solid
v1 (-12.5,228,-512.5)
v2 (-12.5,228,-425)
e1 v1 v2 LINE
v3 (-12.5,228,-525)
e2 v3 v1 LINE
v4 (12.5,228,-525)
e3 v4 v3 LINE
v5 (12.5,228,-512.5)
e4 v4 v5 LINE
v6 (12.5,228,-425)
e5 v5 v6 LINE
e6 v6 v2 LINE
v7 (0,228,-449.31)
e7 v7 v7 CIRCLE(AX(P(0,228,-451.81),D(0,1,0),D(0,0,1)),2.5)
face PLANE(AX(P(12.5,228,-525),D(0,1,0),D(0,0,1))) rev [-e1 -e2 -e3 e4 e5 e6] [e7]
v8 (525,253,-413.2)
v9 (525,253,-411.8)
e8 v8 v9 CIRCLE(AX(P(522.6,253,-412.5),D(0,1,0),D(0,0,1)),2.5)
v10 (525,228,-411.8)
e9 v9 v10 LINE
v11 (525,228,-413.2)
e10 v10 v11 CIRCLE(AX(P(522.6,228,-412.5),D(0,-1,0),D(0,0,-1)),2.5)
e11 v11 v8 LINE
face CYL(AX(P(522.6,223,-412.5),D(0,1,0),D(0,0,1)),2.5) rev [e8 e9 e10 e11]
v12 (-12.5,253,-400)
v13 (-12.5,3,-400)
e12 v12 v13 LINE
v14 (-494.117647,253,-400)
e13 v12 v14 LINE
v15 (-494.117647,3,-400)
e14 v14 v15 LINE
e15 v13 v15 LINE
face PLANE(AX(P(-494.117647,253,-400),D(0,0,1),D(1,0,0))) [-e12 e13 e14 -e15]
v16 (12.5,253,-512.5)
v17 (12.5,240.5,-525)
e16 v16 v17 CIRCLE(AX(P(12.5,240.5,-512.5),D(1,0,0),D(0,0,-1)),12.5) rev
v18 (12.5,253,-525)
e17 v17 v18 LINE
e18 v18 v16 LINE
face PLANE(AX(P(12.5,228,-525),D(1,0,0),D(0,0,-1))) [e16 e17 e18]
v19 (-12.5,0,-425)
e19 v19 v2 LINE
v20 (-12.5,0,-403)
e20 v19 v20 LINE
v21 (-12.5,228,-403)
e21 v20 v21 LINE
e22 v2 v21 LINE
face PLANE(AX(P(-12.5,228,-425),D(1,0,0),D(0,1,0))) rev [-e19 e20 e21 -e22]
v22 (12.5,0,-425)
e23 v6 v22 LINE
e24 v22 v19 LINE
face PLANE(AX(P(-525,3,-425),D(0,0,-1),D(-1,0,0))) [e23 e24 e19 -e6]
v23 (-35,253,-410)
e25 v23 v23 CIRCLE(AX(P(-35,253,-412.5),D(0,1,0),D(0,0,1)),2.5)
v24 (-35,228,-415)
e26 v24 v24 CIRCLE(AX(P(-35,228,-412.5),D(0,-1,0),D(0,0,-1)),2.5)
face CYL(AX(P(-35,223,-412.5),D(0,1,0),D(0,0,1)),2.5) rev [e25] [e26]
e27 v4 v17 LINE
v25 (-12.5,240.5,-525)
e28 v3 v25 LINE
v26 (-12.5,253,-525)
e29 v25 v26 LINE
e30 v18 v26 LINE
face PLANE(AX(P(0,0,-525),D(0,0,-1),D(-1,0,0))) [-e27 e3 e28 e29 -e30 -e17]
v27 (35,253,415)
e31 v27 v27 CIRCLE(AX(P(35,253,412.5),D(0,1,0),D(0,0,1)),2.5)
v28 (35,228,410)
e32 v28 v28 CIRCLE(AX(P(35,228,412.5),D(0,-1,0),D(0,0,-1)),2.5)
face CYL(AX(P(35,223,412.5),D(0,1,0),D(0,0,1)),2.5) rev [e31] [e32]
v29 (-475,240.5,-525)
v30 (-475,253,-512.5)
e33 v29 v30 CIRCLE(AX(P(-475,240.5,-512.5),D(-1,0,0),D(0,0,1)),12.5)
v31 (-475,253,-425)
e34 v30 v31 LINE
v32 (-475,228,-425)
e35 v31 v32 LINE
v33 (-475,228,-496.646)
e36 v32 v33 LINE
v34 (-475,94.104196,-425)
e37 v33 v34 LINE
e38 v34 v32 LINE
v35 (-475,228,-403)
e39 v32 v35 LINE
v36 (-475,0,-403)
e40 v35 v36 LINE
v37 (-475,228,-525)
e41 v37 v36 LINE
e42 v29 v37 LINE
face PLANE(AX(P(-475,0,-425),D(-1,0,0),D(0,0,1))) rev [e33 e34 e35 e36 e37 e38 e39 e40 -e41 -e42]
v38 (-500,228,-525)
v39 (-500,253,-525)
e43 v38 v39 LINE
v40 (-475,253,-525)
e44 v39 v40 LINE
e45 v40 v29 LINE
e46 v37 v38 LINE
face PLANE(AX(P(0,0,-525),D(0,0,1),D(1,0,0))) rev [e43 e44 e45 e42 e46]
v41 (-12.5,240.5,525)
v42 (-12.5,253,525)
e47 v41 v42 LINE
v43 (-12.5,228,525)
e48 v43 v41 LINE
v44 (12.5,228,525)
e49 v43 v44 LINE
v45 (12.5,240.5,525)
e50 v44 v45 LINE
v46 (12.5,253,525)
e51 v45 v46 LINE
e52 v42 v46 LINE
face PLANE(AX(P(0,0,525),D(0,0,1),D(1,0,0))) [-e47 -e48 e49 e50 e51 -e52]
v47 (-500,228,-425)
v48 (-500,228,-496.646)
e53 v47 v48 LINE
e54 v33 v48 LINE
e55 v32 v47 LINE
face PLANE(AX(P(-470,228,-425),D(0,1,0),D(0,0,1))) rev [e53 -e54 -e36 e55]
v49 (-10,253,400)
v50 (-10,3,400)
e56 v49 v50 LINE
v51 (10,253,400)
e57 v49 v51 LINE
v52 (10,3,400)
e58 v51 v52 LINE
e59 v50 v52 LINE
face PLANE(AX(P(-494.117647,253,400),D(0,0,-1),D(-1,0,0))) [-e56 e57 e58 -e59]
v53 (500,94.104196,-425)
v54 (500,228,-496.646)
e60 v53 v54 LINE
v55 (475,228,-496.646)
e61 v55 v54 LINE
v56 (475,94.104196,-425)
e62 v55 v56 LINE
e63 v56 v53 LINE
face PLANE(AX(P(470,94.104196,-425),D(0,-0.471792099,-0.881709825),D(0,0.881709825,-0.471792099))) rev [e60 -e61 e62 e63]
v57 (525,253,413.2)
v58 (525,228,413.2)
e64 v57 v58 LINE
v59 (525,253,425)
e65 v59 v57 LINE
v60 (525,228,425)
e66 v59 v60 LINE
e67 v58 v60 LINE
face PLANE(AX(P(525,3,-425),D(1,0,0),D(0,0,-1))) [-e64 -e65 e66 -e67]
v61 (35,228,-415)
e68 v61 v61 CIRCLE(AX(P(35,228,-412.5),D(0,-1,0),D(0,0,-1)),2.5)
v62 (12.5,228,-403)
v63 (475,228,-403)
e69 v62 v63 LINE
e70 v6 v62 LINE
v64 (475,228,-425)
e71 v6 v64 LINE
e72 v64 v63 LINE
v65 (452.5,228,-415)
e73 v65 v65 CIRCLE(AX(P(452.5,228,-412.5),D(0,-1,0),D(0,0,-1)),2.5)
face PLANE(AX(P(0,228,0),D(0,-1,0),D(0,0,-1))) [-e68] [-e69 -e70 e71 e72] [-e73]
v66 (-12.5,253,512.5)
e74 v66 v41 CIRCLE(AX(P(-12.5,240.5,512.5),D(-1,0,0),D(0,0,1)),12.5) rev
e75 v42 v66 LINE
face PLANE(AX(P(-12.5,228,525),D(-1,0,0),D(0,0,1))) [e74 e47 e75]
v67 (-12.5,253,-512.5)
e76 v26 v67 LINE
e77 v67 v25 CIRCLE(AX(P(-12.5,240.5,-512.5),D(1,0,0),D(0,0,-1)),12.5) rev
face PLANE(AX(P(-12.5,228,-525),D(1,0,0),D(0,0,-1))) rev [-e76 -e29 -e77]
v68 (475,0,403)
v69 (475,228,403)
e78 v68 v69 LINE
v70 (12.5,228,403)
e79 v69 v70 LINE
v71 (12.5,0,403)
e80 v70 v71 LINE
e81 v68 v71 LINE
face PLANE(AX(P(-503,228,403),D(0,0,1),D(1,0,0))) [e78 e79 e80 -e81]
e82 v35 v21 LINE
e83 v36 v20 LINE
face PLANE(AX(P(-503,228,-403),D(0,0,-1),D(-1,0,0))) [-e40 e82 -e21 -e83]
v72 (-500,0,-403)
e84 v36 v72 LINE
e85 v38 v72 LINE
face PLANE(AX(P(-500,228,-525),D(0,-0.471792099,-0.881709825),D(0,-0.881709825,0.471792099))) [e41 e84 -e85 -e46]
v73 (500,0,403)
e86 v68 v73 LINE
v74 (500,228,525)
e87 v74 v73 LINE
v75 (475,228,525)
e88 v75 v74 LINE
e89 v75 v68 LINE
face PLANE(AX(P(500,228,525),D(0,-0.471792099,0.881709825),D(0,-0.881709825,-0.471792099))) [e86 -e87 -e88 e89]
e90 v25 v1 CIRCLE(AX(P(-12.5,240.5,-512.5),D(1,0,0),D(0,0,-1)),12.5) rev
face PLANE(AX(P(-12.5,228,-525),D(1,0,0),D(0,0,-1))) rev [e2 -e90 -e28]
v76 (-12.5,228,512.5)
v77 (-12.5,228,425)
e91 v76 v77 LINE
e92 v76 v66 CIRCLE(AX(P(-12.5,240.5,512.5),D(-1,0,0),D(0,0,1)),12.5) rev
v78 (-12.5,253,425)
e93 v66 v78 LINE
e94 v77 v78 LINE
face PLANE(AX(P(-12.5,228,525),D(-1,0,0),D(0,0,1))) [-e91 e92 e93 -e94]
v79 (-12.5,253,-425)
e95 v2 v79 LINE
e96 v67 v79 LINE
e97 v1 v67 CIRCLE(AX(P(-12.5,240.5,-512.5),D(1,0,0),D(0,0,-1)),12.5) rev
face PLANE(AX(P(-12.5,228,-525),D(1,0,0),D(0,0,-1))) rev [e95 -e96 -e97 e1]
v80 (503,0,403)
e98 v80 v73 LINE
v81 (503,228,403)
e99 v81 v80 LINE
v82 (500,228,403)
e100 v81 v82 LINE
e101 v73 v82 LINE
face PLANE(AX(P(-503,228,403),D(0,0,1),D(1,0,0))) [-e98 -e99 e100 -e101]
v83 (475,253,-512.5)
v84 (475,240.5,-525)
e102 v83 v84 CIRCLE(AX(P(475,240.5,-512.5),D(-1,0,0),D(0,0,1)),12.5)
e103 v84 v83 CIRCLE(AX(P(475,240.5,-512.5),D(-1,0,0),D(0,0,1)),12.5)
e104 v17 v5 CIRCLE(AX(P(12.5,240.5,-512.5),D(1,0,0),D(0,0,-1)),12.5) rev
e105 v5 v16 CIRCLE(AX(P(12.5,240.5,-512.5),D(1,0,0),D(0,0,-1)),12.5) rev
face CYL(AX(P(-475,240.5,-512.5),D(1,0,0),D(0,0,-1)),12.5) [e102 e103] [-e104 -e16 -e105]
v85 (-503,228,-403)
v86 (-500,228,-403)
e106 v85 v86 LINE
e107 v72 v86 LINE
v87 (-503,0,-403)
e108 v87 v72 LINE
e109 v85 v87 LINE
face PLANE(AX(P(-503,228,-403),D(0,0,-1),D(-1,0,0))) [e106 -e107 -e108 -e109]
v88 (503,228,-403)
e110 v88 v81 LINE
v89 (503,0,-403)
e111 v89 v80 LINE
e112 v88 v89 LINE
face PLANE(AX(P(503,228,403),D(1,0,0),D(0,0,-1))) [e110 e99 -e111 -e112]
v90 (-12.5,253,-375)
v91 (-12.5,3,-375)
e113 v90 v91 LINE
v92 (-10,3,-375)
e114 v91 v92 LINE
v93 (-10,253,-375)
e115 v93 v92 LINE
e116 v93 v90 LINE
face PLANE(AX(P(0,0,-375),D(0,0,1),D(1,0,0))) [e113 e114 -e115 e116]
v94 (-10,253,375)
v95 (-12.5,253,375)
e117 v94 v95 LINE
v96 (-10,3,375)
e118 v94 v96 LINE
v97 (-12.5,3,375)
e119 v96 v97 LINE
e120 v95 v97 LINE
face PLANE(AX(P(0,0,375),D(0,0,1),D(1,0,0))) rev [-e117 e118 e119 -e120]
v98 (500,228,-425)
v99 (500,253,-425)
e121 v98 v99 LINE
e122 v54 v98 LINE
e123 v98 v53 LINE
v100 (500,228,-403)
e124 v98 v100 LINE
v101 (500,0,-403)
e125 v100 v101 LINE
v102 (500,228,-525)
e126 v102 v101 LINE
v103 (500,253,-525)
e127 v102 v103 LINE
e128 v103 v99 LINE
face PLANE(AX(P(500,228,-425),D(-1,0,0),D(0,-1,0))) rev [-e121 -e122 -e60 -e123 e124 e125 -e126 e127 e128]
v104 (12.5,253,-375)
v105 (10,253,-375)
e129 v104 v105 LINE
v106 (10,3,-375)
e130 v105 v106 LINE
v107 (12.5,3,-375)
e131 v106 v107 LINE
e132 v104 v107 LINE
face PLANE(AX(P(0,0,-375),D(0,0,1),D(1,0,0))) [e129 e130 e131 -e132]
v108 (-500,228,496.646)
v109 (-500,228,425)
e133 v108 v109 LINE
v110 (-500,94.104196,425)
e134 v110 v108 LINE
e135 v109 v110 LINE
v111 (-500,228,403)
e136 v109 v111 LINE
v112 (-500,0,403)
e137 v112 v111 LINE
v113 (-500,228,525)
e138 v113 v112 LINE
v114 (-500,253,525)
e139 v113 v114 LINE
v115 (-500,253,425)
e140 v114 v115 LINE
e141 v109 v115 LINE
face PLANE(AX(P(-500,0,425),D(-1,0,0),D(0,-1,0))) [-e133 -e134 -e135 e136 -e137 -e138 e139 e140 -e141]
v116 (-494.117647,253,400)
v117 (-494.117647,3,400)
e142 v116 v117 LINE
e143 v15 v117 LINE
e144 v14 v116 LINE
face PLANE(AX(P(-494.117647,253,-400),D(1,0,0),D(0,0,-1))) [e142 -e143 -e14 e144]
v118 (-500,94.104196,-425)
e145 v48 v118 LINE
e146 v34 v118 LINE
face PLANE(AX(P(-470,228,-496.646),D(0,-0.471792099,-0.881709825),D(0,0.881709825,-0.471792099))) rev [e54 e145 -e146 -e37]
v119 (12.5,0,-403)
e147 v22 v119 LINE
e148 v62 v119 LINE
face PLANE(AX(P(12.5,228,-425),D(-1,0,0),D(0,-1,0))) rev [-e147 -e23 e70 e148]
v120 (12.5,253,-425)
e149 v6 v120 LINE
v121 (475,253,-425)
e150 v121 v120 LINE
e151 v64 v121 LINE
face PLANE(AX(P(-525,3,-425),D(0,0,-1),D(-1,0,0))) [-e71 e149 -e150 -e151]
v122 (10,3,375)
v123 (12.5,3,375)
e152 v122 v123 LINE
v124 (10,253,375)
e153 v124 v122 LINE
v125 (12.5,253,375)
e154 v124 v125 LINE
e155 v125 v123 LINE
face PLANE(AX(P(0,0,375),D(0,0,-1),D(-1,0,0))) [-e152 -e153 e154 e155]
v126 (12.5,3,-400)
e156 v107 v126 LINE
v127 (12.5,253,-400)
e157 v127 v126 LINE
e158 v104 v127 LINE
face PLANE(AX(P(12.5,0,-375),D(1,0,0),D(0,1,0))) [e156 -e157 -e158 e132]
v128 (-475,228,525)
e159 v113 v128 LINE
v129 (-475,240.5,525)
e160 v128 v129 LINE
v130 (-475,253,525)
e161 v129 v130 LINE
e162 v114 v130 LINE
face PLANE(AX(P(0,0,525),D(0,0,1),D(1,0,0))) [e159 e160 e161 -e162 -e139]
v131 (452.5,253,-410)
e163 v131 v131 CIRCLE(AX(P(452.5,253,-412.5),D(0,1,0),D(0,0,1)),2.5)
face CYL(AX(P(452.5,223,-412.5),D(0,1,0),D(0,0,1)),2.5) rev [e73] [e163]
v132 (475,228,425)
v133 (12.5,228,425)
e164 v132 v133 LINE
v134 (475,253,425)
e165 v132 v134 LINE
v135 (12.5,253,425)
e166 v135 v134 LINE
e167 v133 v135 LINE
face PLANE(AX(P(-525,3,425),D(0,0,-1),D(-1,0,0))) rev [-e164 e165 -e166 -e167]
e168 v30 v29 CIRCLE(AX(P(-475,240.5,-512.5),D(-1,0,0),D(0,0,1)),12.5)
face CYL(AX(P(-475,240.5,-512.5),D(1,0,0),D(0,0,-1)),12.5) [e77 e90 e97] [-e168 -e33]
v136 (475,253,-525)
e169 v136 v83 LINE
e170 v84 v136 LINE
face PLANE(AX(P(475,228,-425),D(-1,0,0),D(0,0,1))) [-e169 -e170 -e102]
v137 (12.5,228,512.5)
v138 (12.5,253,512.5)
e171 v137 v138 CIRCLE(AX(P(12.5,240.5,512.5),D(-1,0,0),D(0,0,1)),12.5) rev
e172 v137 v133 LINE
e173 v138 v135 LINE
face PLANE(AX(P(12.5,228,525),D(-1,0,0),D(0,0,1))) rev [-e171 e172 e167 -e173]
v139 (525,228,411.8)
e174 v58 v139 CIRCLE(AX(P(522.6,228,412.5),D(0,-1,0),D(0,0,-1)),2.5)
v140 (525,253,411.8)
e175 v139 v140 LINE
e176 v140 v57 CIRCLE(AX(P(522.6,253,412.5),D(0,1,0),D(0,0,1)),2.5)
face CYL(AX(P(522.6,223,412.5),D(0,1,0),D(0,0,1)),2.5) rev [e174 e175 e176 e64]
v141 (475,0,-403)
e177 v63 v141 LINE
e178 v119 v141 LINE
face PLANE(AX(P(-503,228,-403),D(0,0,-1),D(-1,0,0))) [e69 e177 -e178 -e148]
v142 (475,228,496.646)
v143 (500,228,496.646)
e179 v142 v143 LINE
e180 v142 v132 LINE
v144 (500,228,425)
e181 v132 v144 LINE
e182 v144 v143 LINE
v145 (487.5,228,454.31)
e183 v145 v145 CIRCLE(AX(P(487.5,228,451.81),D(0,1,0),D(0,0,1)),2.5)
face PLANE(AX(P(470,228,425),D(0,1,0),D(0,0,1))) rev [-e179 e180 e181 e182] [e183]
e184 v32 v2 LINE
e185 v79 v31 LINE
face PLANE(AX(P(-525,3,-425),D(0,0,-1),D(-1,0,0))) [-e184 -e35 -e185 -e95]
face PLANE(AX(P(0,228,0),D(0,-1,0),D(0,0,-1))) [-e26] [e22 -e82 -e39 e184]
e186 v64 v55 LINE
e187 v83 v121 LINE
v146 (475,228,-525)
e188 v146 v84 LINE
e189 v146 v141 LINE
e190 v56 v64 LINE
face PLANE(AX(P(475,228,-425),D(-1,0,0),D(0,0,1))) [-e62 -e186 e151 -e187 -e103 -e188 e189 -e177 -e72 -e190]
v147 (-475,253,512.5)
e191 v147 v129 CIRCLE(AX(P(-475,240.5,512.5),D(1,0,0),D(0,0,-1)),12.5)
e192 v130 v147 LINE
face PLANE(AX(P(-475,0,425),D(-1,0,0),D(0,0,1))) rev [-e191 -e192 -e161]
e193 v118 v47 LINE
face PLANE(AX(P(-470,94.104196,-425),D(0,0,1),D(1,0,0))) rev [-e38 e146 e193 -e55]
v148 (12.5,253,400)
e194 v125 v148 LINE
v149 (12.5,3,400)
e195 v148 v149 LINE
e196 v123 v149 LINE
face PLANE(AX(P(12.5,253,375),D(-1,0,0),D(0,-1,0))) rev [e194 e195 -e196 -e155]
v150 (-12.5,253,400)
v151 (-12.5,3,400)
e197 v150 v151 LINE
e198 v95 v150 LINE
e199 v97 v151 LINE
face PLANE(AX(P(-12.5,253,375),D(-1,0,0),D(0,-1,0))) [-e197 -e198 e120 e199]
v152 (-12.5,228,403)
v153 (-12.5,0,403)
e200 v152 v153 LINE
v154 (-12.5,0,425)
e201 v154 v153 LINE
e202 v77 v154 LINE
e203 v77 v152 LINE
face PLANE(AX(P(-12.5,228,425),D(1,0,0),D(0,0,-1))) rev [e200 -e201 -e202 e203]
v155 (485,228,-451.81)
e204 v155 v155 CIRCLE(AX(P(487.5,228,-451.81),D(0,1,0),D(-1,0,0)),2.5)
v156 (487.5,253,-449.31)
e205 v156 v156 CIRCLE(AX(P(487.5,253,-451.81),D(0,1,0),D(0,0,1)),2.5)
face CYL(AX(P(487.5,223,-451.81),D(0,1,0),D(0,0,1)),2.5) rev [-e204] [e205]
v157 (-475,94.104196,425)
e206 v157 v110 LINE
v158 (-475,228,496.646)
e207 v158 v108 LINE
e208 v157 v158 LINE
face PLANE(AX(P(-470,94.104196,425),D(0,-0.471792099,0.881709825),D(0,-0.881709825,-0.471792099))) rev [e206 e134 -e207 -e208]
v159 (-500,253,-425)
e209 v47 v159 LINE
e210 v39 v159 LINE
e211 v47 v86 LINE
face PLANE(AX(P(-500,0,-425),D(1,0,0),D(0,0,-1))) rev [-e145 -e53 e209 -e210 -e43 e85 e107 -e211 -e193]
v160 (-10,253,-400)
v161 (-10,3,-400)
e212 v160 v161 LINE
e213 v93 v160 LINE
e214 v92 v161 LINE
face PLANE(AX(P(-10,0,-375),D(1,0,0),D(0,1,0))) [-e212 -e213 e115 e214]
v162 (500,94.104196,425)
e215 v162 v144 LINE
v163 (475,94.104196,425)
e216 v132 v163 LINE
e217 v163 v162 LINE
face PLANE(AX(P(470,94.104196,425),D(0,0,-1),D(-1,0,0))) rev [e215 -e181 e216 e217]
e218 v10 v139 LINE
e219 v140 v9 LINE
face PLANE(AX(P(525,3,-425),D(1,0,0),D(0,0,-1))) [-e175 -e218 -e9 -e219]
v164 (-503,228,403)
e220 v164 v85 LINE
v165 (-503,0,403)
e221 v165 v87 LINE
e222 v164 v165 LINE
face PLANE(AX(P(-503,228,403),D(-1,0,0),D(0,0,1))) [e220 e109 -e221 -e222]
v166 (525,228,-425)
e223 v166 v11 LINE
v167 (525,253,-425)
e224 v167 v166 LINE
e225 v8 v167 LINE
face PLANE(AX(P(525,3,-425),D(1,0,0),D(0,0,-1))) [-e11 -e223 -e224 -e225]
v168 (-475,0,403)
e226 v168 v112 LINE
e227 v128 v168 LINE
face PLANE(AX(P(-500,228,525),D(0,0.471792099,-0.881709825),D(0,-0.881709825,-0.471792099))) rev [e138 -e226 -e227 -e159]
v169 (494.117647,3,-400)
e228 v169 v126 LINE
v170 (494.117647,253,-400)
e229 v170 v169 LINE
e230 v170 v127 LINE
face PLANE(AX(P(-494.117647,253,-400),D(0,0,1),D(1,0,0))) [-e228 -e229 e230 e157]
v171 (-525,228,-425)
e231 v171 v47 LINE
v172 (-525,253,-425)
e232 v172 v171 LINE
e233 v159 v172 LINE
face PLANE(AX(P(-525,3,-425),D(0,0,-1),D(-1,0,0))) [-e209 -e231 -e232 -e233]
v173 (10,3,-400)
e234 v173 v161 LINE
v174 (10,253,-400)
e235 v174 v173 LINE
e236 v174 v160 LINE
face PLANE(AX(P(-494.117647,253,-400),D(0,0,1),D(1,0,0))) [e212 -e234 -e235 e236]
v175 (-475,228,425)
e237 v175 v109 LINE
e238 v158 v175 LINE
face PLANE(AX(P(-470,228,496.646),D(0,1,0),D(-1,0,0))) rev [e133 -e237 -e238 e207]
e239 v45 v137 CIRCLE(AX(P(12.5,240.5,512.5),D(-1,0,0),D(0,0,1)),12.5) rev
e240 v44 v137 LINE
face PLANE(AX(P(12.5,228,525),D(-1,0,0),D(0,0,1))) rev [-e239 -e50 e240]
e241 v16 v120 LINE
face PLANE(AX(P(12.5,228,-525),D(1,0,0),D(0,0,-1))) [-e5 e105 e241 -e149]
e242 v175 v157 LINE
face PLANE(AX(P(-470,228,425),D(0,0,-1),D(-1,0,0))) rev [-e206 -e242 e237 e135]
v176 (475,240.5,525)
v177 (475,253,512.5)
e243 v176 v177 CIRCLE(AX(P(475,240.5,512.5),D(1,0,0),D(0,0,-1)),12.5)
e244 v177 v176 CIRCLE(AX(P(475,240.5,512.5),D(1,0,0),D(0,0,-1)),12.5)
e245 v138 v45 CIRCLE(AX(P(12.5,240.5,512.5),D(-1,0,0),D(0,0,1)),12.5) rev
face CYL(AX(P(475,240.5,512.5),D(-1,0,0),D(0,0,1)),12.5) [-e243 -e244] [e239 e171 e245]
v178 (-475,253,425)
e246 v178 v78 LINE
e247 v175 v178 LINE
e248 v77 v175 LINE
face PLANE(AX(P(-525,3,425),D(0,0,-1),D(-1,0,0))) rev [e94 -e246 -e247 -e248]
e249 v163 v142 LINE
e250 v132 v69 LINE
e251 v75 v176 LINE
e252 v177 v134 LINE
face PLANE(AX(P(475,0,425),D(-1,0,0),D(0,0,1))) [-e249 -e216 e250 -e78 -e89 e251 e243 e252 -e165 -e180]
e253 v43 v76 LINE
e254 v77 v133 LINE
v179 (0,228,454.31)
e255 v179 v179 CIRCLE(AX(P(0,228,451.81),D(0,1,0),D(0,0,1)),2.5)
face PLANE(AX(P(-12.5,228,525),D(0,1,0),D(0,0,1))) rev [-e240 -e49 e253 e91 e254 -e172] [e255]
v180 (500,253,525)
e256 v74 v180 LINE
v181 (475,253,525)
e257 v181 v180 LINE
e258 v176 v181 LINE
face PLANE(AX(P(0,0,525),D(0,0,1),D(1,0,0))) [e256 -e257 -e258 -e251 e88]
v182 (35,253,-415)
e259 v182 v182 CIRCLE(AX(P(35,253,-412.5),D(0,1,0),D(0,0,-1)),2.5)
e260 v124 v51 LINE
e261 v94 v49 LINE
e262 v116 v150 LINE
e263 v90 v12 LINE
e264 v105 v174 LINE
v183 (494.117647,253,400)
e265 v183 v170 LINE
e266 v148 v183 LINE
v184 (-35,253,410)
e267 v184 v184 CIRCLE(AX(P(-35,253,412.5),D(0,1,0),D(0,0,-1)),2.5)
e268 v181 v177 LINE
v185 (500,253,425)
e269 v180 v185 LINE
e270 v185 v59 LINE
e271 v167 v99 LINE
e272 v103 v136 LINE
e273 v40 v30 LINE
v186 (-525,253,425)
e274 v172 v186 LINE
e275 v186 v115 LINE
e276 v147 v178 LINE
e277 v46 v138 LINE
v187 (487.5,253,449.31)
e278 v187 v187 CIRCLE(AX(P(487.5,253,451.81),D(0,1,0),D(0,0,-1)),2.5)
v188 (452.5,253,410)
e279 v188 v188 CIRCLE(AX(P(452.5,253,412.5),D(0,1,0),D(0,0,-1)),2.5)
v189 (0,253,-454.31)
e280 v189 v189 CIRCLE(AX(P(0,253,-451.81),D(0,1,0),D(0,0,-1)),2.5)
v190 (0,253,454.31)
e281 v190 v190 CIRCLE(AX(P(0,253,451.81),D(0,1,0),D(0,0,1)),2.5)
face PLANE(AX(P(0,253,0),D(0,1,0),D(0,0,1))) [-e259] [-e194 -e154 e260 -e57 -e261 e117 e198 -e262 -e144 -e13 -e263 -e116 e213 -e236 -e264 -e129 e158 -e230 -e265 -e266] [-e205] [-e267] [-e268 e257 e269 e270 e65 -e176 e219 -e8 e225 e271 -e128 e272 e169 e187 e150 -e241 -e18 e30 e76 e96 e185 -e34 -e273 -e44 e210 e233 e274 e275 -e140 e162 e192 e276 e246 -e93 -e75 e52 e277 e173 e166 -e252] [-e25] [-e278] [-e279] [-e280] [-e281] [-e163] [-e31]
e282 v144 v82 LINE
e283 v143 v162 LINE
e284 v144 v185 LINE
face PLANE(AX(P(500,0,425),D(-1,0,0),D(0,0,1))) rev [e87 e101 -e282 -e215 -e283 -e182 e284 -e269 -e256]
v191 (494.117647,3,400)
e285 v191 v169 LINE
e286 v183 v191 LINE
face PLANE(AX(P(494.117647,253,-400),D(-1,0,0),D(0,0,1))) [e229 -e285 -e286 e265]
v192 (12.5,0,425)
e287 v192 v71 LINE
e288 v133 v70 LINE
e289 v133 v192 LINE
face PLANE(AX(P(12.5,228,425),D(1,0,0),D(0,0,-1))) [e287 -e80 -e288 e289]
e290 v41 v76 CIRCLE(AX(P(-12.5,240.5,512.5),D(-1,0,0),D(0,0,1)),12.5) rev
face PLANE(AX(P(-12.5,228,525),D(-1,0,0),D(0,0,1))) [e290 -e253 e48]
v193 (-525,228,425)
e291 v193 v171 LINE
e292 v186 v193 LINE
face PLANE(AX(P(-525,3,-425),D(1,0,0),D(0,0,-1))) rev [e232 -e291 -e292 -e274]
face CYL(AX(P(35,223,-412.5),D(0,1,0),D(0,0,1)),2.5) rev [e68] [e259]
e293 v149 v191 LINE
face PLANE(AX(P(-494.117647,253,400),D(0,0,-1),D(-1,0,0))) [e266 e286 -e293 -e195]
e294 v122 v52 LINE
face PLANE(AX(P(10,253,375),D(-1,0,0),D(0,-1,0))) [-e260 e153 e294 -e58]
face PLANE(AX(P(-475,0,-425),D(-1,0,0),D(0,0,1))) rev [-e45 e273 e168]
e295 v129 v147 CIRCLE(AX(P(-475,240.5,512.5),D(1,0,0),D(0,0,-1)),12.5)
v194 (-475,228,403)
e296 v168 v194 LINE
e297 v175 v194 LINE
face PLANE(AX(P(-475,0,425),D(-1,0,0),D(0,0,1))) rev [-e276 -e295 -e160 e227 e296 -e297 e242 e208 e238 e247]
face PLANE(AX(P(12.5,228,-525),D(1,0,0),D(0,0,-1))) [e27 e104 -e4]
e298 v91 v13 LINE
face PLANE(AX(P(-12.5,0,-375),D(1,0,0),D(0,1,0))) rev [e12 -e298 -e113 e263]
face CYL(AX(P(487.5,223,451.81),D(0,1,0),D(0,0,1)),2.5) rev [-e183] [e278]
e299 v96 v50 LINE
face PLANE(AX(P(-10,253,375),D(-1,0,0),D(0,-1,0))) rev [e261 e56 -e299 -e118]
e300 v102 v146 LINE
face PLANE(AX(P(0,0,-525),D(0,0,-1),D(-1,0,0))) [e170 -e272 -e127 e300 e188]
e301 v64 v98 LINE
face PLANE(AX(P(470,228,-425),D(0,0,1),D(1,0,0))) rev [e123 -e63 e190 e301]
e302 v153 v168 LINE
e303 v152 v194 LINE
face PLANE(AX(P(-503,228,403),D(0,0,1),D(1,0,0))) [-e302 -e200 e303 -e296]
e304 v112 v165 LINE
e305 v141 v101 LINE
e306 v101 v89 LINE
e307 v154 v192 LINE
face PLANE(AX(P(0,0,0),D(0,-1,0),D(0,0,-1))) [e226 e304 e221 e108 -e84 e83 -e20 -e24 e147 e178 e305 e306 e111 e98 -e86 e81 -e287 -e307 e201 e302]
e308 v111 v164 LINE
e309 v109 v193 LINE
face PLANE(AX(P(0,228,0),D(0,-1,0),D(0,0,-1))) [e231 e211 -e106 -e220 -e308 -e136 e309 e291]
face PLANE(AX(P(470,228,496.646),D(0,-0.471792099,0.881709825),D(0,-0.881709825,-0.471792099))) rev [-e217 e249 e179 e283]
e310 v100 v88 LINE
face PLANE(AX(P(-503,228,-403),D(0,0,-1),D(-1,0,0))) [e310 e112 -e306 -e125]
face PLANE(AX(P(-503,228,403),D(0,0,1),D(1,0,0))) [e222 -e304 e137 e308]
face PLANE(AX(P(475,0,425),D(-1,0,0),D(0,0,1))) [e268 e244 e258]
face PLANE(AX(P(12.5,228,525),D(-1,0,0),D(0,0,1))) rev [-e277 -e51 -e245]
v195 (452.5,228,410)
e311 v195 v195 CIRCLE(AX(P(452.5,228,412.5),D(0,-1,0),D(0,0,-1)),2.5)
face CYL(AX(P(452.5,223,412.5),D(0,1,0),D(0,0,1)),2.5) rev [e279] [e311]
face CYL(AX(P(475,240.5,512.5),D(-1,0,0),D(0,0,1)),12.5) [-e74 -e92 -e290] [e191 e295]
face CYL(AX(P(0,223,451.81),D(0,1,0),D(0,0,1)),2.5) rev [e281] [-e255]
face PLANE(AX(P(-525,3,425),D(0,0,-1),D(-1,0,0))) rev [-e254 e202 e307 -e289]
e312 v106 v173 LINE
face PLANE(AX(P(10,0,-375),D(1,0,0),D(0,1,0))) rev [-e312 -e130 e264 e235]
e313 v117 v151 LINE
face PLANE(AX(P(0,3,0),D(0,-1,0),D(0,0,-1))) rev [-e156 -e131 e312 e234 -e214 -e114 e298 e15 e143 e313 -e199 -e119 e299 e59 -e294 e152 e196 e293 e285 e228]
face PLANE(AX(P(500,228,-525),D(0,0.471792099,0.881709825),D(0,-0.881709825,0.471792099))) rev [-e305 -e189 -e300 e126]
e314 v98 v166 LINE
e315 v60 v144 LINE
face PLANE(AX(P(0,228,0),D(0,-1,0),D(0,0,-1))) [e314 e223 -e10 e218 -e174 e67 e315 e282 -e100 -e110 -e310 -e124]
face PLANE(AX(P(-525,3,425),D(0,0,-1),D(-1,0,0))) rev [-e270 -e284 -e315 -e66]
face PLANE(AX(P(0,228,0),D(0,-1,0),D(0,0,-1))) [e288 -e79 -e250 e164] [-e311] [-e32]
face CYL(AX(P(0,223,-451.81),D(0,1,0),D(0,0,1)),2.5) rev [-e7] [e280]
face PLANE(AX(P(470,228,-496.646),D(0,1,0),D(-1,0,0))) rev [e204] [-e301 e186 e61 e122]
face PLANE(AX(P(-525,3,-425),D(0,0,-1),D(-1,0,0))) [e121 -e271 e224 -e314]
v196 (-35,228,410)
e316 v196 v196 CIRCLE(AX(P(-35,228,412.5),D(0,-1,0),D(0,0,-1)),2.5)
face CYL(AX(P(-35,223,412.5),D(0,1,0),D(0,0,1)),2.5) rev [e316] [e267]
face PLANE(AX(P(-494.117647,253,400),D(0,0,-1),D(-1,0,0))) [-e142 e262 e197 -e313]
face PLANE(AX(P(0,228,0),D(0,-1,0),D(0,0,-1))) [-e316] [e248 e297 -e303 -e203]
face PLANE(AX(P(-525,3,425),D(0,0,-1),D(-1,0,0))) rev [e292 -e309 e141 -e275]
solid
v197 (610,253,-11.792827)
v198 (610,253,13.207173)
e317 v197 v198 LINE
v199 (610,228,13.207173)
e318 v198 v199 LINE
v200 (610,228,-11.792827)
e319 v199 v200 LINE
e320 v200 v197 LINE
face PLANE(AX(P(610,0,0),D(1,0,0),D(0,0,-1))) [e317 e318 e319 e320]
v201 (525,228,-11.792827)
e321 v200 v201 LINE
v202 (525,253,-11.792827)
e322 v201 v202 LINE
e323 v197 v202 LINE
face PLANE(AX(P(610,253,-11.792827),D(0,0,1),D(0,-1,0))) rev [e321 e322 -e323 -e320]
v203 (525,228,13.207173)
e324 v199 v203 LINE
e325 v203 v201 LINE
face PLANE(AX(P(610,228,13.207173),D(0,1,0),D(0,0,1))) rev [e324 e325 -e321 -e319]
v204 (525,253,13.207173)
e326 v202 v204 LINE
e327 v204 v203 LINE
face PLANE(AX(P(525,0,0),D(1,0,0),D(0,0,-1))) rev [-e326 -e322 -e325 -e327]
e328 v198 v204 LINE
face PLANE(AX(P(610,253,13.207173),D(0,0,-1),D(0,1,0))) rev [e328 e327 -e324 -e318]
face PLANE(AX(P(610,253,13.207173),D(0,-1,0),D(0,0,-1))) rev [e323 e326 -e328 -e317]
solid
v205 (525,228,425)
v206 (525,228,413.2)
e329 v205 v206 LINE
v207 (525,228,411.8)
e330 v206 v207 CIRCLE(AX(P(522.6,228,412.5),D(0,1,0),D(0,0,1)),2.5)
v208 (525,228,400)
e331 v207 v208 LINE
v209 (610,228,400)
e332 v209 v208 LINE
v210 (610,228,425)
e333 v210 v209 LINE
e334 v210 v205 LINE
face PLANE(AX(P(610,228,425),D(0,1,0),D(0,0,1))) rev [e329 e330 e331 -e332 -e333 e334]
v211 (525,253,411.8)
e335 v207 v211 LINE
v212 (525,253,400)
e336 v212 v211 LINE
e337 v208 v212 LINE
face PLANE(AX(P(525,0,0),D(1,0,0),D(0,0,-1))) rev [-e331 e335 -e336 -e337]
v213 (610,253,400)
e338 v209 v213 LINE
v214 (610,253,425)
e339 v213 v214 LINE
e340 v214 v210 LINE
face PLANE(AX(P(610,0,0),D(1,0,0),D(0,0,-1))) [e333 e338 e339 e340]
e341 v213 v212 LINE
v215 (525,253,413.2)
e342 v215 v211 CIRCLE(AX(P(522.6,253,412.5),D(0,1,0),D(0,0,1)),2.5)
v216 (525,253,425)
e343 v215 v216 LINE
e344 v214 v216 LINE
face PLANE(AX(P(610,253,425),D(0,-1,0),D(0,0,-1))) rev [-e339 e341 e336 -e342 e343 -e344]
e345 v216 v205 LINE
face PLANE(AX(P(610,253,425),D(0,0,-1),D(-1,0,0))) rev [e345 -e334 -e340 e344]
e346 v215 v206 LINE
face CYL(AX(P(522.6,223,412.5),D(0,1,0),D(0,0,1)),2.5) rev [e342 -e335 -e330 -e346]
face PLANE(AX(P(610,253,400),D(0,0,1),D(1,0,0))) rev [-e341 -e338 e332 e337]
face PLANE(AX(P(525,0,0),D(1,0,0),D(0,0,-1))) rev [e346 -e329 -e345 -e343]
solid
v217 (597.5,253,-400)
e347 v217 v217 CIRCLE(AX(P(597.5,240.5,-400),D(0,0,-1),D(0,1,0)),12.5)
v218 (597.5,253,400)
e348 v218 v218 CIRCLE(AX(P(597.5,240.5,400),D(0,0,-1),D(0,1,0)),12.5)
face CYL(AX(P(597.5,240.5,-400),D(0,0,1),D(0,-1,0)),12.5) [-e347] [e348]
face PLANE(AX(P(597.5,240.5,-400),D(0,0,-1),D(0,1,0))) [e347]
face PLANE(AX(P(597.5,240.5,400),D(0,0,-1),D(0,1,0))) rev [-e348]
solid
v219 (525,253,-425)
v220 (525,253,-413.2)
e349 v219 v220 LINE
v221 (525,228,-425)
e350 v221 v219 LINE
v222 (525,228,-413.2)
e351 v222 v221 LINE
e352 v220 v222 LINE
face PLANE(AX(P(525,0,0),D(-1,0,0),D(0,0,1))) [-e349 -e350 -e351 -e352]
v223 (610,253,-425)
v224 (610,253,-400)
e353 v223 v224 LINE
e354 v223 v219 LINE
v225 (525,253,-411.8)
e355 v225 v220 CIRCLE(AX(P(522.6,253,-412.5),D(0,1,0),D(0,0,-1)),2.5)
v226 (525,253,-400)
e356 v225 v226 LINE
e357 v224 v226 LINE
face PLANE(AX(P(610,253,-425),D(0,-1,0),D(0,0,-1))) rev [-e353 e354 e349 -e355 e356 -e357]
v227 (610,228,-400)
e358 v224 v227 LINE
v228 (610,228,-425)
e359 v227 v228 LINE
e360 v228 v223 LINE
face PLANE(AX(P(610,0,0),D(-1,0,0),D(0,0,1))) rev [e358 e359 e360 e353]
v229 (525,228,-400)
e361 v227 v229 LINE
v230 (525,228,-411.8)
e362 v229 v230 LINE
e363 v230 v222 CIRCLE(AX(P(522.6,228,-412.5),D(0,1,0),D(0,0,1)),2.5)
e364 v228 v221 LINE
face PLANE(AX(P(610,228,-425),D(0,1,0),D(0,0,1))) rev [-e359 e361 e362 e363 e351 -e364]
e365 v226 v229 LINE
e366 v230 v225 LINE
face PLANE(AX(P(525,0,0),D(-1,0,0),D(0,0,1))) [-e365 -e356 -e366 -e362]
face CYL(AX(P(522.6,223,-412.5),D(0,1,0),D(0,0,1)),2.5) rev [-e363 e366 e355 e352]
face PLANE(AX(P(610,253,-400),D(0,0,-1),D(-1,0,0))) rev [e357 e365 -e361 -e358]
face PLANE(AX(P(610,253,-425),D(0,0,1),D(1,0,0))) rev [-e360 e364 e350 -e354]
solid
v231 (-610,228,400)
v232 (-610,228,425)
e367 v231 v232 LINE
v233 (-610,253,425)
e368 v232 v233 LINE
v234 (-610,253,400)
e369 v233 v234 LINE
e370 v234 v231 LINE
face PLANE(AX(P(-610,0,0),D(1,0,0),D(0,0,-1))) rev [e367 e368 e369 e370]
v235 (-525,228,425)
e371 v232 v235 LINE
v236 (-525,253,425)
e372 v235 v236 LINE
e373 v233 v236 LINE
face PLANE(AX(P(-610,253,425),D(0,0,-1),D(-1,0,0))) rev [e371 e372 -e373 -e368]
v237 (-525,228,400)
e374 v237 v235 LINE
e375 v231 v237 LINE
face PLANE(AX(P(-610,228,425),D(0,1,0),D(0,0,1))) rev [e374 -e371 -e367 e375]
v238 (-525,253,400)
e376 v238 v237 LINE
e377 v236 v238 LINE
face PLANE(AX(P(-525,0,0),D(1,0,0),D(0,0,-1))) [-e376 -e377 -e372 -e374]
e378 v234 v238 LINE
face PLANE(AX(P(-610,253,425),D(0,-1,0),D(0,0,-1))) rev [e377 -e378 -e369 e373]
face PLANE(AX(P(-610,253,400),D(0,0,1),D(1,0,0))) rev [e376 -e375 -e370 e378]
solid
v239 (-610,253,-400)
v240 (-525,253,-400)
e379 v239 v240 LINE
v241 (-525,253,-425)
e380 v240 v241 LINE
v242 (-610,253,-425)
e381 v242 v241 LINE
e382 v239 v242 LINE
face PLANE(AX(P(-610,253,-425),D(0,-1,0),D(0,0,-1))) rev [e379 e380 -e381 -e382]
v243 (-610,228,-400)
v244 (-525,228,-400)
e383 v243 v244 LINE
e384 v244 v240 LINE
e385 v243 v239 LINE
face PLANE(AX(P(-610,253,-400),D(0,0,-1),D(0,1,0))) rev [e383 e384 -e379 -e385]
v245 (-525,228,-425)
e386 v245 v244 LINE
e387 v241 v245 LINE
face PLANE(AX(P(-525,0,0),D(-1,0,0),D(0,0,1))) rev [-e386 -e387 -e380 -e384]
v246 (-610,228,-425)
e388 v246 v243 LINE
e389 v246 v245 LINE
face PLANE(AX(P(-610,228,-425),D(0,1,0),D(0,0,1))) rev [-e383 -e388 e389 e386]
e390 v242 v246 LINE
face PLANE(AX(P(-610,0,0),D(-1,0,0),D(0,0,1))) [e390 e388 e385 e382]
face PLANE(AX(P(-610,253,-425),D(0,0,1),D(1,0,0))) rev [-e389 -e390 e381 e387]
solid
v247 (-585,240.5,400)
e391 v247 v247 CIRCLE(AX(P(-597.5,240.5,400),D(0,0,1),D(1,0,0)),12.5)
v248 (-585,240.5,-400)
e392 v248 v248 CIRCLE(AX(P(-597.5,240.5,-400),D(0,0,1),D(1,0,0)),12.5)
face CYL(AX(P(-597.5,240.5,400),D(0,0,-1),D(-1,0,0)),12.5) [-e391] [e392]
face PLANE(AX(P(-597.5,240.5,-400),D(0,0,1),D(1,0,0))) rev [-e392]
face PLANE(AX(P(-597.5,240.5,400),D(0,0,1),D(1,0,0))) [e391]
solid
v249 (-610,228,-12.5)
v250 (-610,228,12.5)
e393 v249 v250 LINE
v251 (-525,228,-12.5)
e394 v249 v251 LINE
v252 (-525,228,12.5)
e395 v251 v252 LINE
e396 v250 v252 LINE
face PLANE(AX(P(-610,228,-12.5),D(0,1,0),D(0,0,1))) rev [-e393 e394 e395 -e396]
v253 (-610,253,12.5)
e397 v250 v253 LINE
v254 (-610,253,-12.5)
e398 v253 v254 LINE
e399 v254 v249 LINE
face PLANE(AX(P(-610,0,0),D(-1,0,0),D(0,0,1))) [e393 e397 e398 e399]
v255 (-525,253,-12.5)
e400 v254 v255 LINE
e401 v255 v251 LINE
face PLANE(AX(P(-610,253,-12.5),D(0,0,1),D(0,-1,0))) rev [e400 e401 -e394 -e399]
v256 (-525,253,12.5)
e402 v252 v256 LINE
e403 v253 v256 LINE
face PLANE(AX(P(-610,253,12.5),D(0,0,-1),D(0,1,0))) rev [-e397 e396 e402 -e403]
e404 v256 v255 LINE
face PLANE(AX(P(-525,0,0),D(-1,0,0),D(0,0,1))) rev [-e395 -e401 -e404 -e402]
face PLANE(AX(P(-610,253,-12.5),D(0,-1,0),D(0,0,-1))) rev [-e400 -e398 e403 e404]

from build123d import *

# Parameters (mm, degrees)
SKETCH1_W            = 1050
SKETCH1_H            = 850
BOSS_EXTRUDE2_DEPTH  = 3
SKETCH2_W            = 1050
SKETCH2_H            = 850
SKETCH2_W_2          = 988.235294118
SKETCH2_H_2          = 800
BOSS_EXTRUDE4_DEPTH  = 250
SKETCH3_W            = 1050
SKETCH3_H            = 850
SKETCH3_W_2          = 1006
SKETCH3_H_2          = 806
CUT_EXTRUDE2_DEPTH   = 228
SKETCH6_W            = 25
SKETCH6_H            = 25
BASE_FLANGE1_DEPTH   = 85
SKETCH11_W           = 25
SKETCH11_H           = 25
BASE_FLANGE2_DEPTH   = 85
SKETCH14_W           = 25
SKETCH14_H           = 25
BASE_FLANGE3_DEPTH   = 85
SKETCH17_R           = 12.5
BASE_FLANGE5_DEPTH   = 800
SKETCH22_W           = 25
SKETCH22_H           = 25
BASE_FLANGE6_DEPTH   = 85
SKETCH25_W           = 25
SKETCH25_H           = 25
BASE_FLANGE7_DEPTH   = 85
SKETCH29_W           = 25
SKETCH29_H           = 25
BASE_FLANGE8_DEPTH   = 85
SKETCH32_R           = 12.5
BASE_FLANGE9_DEPTH   = 800
SKETCH83_W           = 25
SKETCH83_H           = 228
BOSS_EXTRUDE5_DEPTH  = 22
SKETCH85_W           = 25
SKETCH85_H           = 228
BOSS_EXTRUDE6_DEPTH  = 22
SKETCH87_W           = 25
SKETCH87_H           = 228
BOSS_EXTRUDE7_DEPTH  = 22
SKETCH88_W           = 25
SKETCH88_H           = 228
BOSS_EXTRUDE8_DEPTH  = 22
SKETCH89_W           = 25
SKETCH89_H           = 228
BOSS_EXTRUDE9_DEPTH  = 22
SKETCH90_W           = 25
SKETCH90_H           = 228
BOSS_EXTRUDE10_DEPTH = 22
SKETCH91_W           = 25
SKETCH91_H           = 25
BOSS_EXTRUDE11_DEPTH = 100
SKETCH92_W           = 25
SKETCH92_H           = 25
BOSS_EXTRUDE12_DEPTH = 100
SKETCH93_W           = 25
SKETCH93_H           = 25
BOSS_EXTRUDE13_DEPTH = 100
SKETCH94_W           = 25
SKETCH94_H           = 25
BOSS_EXTRUDE14_DEPTH = 100
SKETCH95_W           = 25
SKETCH95_H           = 25
BOSS_EXTRUDE15_DEPTH = 100
SKETCH96_W           = 25
SKETCH96_H           = 25
BOSS_EXTRUDE16_DEPTH = 100
SKETCH114_W          = 2.5
SKETCH114_H          = 250
BOSS_EXTRUDE22_DEPTH = 25
SKETCH120_W          = 2.5
SKETCH120_H          = 250
BOSS_EXTRUDE24_DEPTH = 25
RIB107_REACH         = 1255.688
SKETCH109_WALL_W     = 2767.964794142
SKETCH109_WALL_H     = 25
CUT_EXTRUDE10_DEPTH  = 30
RIB108_REACH         = 1255.688
SKETCH123_WALL_W     = 2767.964794142
SKETCH123_WALL_H     = 25
CUT_EXTRUDE12_DEPTH  = 30
CUT_EXTRUDE13_DEPTH  = 30
CUT_EXTRUDE14_DEPTH  = 30
RIB110_REACH         = 1255.688
SKETCH128_WALL_W     = 2767.964794142
SKETCH128_WALL_H     = 25
CUT_EXTRUDE15_DEPTH  = 30
CUT_EXTRUDE16_DEPTH  = 30
RIB118_REACH         = 1255.688
SKETCH134_WALL_W     = 2767.964794142
SKETCH134_WALL_H     = 25
CUT_EXTRUDE17_DEPTH  = 30
CUT_EXTRUDE18_DEPTH  = 30
SKETCH137_R          = 12.5
BOSS_EXTRUDE25_DEPTH = 950
SKETCH138_R          = 12.5
BOSS_EXTRUDE26_DEPTH = 950
SKETCH139_R          = 2.5
CUT_EXTRUDE30_DEPTH  = 30


# Sheet-metal steps are written as plain solids
with BuildPart() as part:
    # Sketch1 → Boss-Extrude2 (new body)
    with BuildSketch(Plane(origin=(0, 0, 0), x_dir=(1, 0, 0), z_dir=(0, 1, 0))):
        Rectangle(SKETCH1_W, SKETCH1_H)
    extrude(amount=BOSS_EXTRUDE2_DEPTH)

    # Sketch2 → Boss-Extrude4 (add)
    with BuildSketch(Plane(origin=(0, 3, 0), x_dir=(1, 0, 0), z_dir=(0, 1, 0))):
        Rectangle(SKETCH2_W, SKETCH2_H)
        Rectangle(SKETCH2_W_2, SKETCH2_H_2, mode=Mode.SUBTRACT)
    extrude(amount=BOSS_EXTRUDE4_DEPTH)

    # Sketch3 → Cut-Extrude2 (cut)
    with BuildSketch(Plane.XZ):
        Rectangle(SKETCH3_W, SKETCH3_H)
        Rectangle(SKETCH3_W_2, SKETCH3_H_2, mode=Mode.SUBTRACT)
    extrude(amount=-CUT_EXTRUDE2_DEPTH, mode=Mode.SUBTRACT)

    # Sketch83 → Boss-Extrude5 (add)
    with BuildSketch(Plane(origin=(0, 0, -403), x_dir=(-1, 0, 0), z_dir=(0, 0, -1))):
        with Locations((-487.5, 114)):
            Rectangle(SKETCH83_W, SKETCH83_H)
    extrude(amount=BOSS_EXTRUDE5_DEPTH)

    # Sketch85 → Boss-Extrude6 (add)
    with BuildSketch(Plane(origin=(0, 0, -403), x_dir=(-1, 0, 0), z_dir=(0, 0, -1))):
        with Locations((487.5, 114)):
            Rectangle(SKETCH85_W, SKETCH85_H)
    extrude(amount=BOSS_EXTRUDE6_DEPTH)

    # Sketch87 → Boss-Extrude7 (add)
    with BuildSketch(Plane(origin=(0, 0, -403), x_dir=(-1, 0, 0), z_dir=(0, 0, -1))):
        with Locations((0, 114)):
            Rectangle(SKETCH87_W, SKETCH87_H)
    extrude(amount=BOSS_EXTRUDE7_DEPTH)

    # Sketch88 → Boss-Extrude8 (add)
    with BuildSketch(Plane.XY.offset(403)):
        with Locations((-487.5, 114)):
            Rectangle(SKETCH88_W, SKETCH88_H)
    extrude(amount=BOSS_EXTRUDE8_DEPTH)

    # Sketch89 → Boss-Extrude9 (add)
    with BuildSketch(Plane.XY.offset(403)):
        with Locations((487.5, 114)):
            Rectangle(SKETCH89_W, SKETCH89_H)
    extrude(amount=BOSS_EXTRUDE9_DEPTH)

    # Sketch90 → Boss-Extrude10 (add)
    with BuildSketch(Plane.XY.offset(403)):
        with Locations((0, 114)):
            Rectangle(SKETCH90_W, SKETCH90_H)
    extrude(amount=BOSS_EXTRUDE10_DEPTH)

    # Sketch91 → Boss-Extrude11 (add)
    with BuildSketch(Plane.XY.offset(425)):
        with Locations((-487.5, 240.5)):
            Rectangle(SKETCH91_W, SKETCH91_H)
    extrude(amount=BOSS_EXTRUDE11_DEPTH)

    # Sketch92 → Boss-Extrude12 (add)
    with BuildSketch(Plane.XY.offset(425)):
        with Locations((0, 240.5)):
            Rectangle(SKETCH92_W, SKETCH92_H)
    extrude(amount=BOSS_EXTRUDE12_DEPTH)

    # Sketch93 → Boss-Extrude13 (add)
    with BuildSketch(Plane.XY.offset(425)):
        with Locations((487.5, 240.5)):
            Rectangle(SKETCH93_W, SKETCH93_H)
    extrude(amount=BOSS_EXTRUDE13_DEPTH)

    # Sketch94 → Boss-Extrude14 (add)
    with BuildSketch(Plane(origin=(0, 0, -425), x_dir=(-1, 0, 0), z_dir=(0, 0, -1))):
        with Locations((-487.5, 240.5)):
            Rectangle(SKETCH94_W, SKETCH94_H)
    extrude(amount=BOSS_EXTRUDE14_DEPTH)

    # Sketch95 → Boss-Extrude15 (add)
    with BuildSketch(Plane(origin=(0, 0, -425), x_dir=(-1, 0, 0), z_dir=(0, 0, -1))):
        with Locations((0, 240.5)):
            Rectangle(SKETCH95_W, SKETCH95_H)
    extrude(amount=BOSS_EXTRUDE15_DEPTH)

    # Sketch96 → Boss-Extrude16 (add)
    with BuildSketch(Plane(origin=(0, 0, -425), x_dir=(-1, 0, 0), z_dir=(0, 0, -1))):
        with Locations((487.5, 240.5)):
            Rectangle(SKETCH96_W, SKETCH96_H)
    extrude(amount=BOSS_EXTRUDE16_DEPTH)

    # Sketch114 → Boss-Extrude22 (add)
    with BuildSketch(Plane(origin=(0, 0, 400), x_dir=(-1, 0, 0), z_dir=(0, 0, -1))):
        with Locations((-11.25, 128)):
            Rectangle(SKETCH114_W, SKETCH114_H)
        with Locations((11.25, 128)):
            Rectangle(SKETCH114_W, SKETCH114_H)
    extrude(amount=BOSS_EXTRUDE22_DEPTH)

    # Sketch120 → Boss-Extrude24 (add)
    with BuildSketch(Plane.XY.offset(-400)):
        with Locations((-11.25, 128)):
            Rectangle(SKETCH120_W, SKETCH120_H)
        with Locations((11.25, 128)):
            Rectangle(SKETCH120_W, SKETCH120_H)
    extrude(amount=BOSS_EXTRUDE24_DEPTH)

    # Sketch109 wall → Rib107 (add, up to next)
    with BuildSketch(Plane(origin=(500, 114, 464), x_dir=(0, -0.881709824778, -0.471792099223), z_dir=(0, 0.471792099223, -0.881709824778)), mode=Mode.PRIVATE) as rib107_sk1:
        with Locations((0, 12.5)):
            Rectangle(SKETCH109_WALL_W, SKETCH109_WALL_H)
    rib107_tool1 = extrude(rib107_sk1.sketch, amount=RIB107_REACH, mode=Mode.PRIVATE) - part.part
    add(rib107_tool1.solids().sort_by_distance((500, 114, 464))[0])

    # Sketch121 → Cut-Extrude10 (cut)
    with BuildSketch(Plane(origin=(500, 0, 0), x_dir=(0, 0, -1), z_dir=(1, 0, 0))):
        Polygon((-425, 41.114754098), (-403, 0), (-425, 0), align=None)
    extrude(amount=-CUT_EXTRUDE10_DEPTH, mode=Mode.SUBTRACT)

    # Sketch123 wall → Rib108 (add, up to next)
    with BuildSketch(Plane(origin=(-500, 114, 464), x_dir=(0, -0.881709824778, -0.471792099223), z_dir=(0, -0.471792099223, 0.881709824778)), mode=Mode.PRIVATE) as rib108_sk1:
        with Locations((0, 12.5)):
            Rectangle(SKETCH123_WALL_W, SKETCH123_WALL_H)
    rib108_tool1 = extrude(rib108_sk1.sketch, amount=-RIB108_REACH, mode=Mode.PRIVATE) - part.part
    add(rib108_tool1.solids().sort_by_distance((-500, 114, 464))[0])

    # Sketch125 → Cut-Extrude12 (cut)
    with BuildSketch(Plane.ZY.offset(500)):
        Polygon((425, 41.114754098), (403, 0), (425, 0), align=None)
    extrude(amount=-CUT_EXTRUDE12_DEPTH, mode=Mode.SUBTRACT)

    # Sketch126 → Cut-Extrude13 (cut)
    with BuildSketch(Plane.ZY.offset(500)):
        Polygon((425, 228), (425, 94.104195933), (496.646000422, 228), align=None)
    extrude(amount=-CUT_EXTRUDE13_DEPTH, mode=Mode.SUBTRACT)

    # Sketch127 → Cut-Extrude14 (cut)
    with BuildSketch(Plane(origin=(500, 0, 0), x_dir=(0, 0, -1), z_dir=(1, 0, 0))):
        Polygon((-425, 228), (-496.646000422, 228), (-425, 94.104195933), align=None)
    extrude(amount=-CUT_EXTRUDE14_DEPTH, mode=Mode.SUBTRACT)

    # Sketch128 wall → Rib110 (add, up to next)
    with BuildSketch(Plane(origin=(500, 114, -464), x_dir=(0, -0.881709824778, 0.471792099223), z_dir=(0, -0.471792099223, -0.881709824778)), mode=Mode.PRIVATE) as rib110_sk1:
        with Locations((0, 12.5)):
            Rectangle(SKETCH128_WALL_W, SKETCH128_WALL_H)
    rib110_tool1 = extrude(rib110_sk1.sketch, amount=-RIB110_REACH, mode=Mode.PRIVATE) - part.part
    add(rib110_tool1.solids().sort_by_distance((500, 114, -464))[0])

    # Sketch129 → Cut-Extrude15 (cut)
    with BuildSketch(Plane(origin=(500, 0, 0), x_dir=(0, 0, -1), z_dir=(1, 0, 0))):
        Polygon((425, 41.114754098), (403, 0), (425, 0), align=None)
    extrude(amount=-CUT_EXTRUDE15_DEPTH, mode=Mode.SUBTRACT)

    # Sketch130 → Cut-Extrude16 (cut)
    with BuildSketch(Plane(origin=(500, 0, 0), x_dir=(0, 0, -1), z_dir=(1, 0, 0))):
        Polygon((425, 228), (425, 94.104195933), (496.646000422, 228), align=None)
    extrude(amount=-CUT_EXTRUDE16_DEPTH, mode=Mode.SUBTRACT)

    # Sketch134 wall → Rib118 (add, up to next)
    with BuildSketch(Plane(origin=(-500, 114, -464), x_dir=(0, -0.881709824778, 0.471792099223), z_dir=(0, 0.471792099223, 0.881709824778)), mode=Mode.PRIVATE) as rib118_sk1:
        with Locations((0, 12.5)):
            Rectangle(SKETCH134_WALL_W, SKETCH134_WALL_H)
    rib118_tool1 = extrude(rib118_sk1.sketch, amount=RIB118_REACH, mode=Mode.PRIVATE) - part.part
    add(rib118_tool1.solids().sort_by_distance((-500, 114, -464))[0])

    # Sketch135 → Cut-Extrude17 (cut)
    with BuildSketch(Plane.ZY.offset(500)):
        Polygon((-425, 41.114754098), (-425, 0), (-403, 0), align=None)
    extrude(amount=-CUT_EXTRUDE17_DEPTH, mode=Mode.SUBTRACT)

    # Sketch136 → Cut-Extrude18 (cut)
    with BuildSketch(Plane.ZY.offset(500)):
        Polygon((-425, 228), (-496.646000422, 228), (-425, 94.104195933), align=None)
    extrude(amount=-CUT_EXTRUDE18_DEPTH, mode=Mode.SUBTRACT)

    # Sketch137 → Boss-Extrude25 (add)
    with BuildSketch(Plane.ZY.offset(-475)):
        with Locations(Location((-512.5, 240.5, 0), (0, 0, 180))):
            Circle(SKETCH137_R)
    extrude(amount=BOSS_EXTRUDE25_DEPTH)

    # Sketch138 → Boss-Extrude26 (add)
    with BuildSketch(Plane(origin=(-475, 0, 0), x_dir=(0, 0, -1), z_dir=(1, 0, 0))):
        with Locations(Location((-512.5, 240.5, 0), (0, 0, 180))):
            Circle(SKETCH138_R)
    extrude(amount=BOSS_EXTRUDE26_DEPTH)


with BuildPart() as body_2:
    # Sketch6 → Base-Flange1 (new body)
    with BuildSketch(Plane(origin=(525, 0, 0), x_dir=(0, 0, -1), z_dir=(1, 0, 0))):
        with Locations((-412.5, 240.5)):
            Rectangle(SKETCH6_W, SKETCH6_H)
    extrude(amount=BASE_FLANGE1_DEPTH)


with BuildPart() as body_3:
    # Sketch11 → Base-Flange2 (new body)
    with BuildSketch(Plane(origin=(525, 0, 0), x_dir=(0, 0, -1), z_dir=(1, 0, 0))):
        with Locations((412.5, 240.5)):
            Rectangle(SKETCH11_W, SKETCH11_H)
    extrude(amount=BASE_FLANGE2_DEPTH)


with BuildPart() as body_4:
    # Sketch14 → Base-Flange3 (new body)
    with BuildSketch(Plane(origin=(525, 0, 0), x_dir=(0, 0, -1), z_dir=(1, 0, 0))):
        with Locations((-0.707172723, 240.5)):
            Rectangle(SKETCH14_W, SKETCH14_H)
    extrude(amount=BASE_FLANGE3_DEPTH)


with BuildPart() as body_5:
    # Sketch17 → Base-Flange5 (new body)
    with BuildSketch(Plane(origin=(0, 0, 400), x_dir=(-1, 0, 0), z_dir=(0, 0, -1))):
        with Locations(Location((-597.5, 240.5, 0), (0, 0, 90))):
            Circle(SKETCH17_R)
    extrude(amount=BASE_FLANGE5_DEPTH)


with BuildPart() as body_6:
    # Sketch22 → Base-Flange6 (new body)
    with BuildSketch(Plane.ZY.offset(525)):
        with Locations((-412.5, 240.5)):
            Rectangle(SKETCH22_W, SKETCH22_H)
    extrude(amount=BASE_FLANGE6_DEPTH)


with BuildPart() as body_7:
    # Sketch25 → Base-Flange7 (new body)
    with BuildSketch(Plane.ZY.offset(525)):
        with Locations((412.5, 240.5)):
            Rectangle(SKETCH25_W, SKETCH25_H)
    extrude(amount=BASE_FLANGE7_DEPTH)


with BuildPart() as body_8:
    # Sketch29 → Base-Flange8 (new body)
    with BuildSketch(Plane.ZY.offset(525)):
        with Locations((0, 240.5)):
            Rectangle(SKETCH29_W, SKETCH29_H)
    extrude(amount=BASE_FLANGE8_DEPTH)


with BuildPart() as body_9:
    # Sketch32 → Base-Flange9 (new body)
    with BuildSketch(Plane.XY.offset(-400)):
        with Locations((-597.5, 240.5)):
            Circle(SKETCH32_R)
    extrude(amount=BASE_FLANGE9_DEPTH)


with BuildPart() as cut_extrude30_tool:
    # Sketch139 → Cut-Extrude30 (new body)
    with BuildSketch(Plane(origin=(0, 253, 0), x_dir=(1, 0, 0), z_dir=(0, 1, 0))):
        with Locations(Location((35, -412.5, 0), (0, 0, 270))):
            Circle(SKETCH139_R)
        with Locations(Location((-35, -412.5, 0), (0, 0, 90))):
            Circle(SKETCH139_R)
        with Locations(Location((0, -451.81, 0), (0, 0, 270))):
            Circle(SKETCH139_R)
        with Locations(Location((0, 451.81, 0), (0, 0, 270))):
            Circle(SKETCH139_R)
        with Locations(Location((35, 412.5, 0), (0, 0, 90))):
            Circle(SKETCH139_R)
        with Locations(Location((-35, 412.5, 0), (0, 0, 270))):
            Circle(SKETCH139_R)
        with Locations(Location((452.5, 412.5, 0), (0, 0, 270))):
            Circle(SKETCH139_R)
        with Locations((522.6, 412.5)):
            Circle(SKETCH139_R)
        with Locations(Location((487.5, 451.81, 0), (0, 0, 270))):
            Circle(SKETCH139_R)
        with Locations((522.6, -412.5)):
            Circle(SKETCH139_R)
        with Locations(Location((452.5, -412.5, 0), (0, 0, 90))):
            Circle(SKETCH139_R)
        with Locations(Location((487.5, -451.81, 0), (0, 0, 270))):
            Circle(SKETCH139_R)
    extrude(amount=-CUT_EXTRUDE30_DEPTH)


with BuildPart() as part_1:
    add(part.part)

    # Cut-Extrude30: cut by cut_extrude30_tool
    add(cut_extrude30_tool.part, mode=Mode.SUBTRACT)


with BuildPart() as body_2_1:
    add(body_2.part)

    # Cut-Extrude30: cut by cut_extrude30_tool
    add(cut_extrude30_tool.part, mode=Mode.SUBTRACT)


with BuildPart() as body_3_1:
    add(body_3.part)

    # Cut-Extrude30: cut by cut_extrude30_tool
    add(cut_extrude30_tool.part, mode=Mode.SUBTRACT)


solid = Compound([body_4.part, body_5.part, body_6.part, body_7.part, body_8.part, body_9.part, part_1.part, body_2_1.part, body_3_1.part])
